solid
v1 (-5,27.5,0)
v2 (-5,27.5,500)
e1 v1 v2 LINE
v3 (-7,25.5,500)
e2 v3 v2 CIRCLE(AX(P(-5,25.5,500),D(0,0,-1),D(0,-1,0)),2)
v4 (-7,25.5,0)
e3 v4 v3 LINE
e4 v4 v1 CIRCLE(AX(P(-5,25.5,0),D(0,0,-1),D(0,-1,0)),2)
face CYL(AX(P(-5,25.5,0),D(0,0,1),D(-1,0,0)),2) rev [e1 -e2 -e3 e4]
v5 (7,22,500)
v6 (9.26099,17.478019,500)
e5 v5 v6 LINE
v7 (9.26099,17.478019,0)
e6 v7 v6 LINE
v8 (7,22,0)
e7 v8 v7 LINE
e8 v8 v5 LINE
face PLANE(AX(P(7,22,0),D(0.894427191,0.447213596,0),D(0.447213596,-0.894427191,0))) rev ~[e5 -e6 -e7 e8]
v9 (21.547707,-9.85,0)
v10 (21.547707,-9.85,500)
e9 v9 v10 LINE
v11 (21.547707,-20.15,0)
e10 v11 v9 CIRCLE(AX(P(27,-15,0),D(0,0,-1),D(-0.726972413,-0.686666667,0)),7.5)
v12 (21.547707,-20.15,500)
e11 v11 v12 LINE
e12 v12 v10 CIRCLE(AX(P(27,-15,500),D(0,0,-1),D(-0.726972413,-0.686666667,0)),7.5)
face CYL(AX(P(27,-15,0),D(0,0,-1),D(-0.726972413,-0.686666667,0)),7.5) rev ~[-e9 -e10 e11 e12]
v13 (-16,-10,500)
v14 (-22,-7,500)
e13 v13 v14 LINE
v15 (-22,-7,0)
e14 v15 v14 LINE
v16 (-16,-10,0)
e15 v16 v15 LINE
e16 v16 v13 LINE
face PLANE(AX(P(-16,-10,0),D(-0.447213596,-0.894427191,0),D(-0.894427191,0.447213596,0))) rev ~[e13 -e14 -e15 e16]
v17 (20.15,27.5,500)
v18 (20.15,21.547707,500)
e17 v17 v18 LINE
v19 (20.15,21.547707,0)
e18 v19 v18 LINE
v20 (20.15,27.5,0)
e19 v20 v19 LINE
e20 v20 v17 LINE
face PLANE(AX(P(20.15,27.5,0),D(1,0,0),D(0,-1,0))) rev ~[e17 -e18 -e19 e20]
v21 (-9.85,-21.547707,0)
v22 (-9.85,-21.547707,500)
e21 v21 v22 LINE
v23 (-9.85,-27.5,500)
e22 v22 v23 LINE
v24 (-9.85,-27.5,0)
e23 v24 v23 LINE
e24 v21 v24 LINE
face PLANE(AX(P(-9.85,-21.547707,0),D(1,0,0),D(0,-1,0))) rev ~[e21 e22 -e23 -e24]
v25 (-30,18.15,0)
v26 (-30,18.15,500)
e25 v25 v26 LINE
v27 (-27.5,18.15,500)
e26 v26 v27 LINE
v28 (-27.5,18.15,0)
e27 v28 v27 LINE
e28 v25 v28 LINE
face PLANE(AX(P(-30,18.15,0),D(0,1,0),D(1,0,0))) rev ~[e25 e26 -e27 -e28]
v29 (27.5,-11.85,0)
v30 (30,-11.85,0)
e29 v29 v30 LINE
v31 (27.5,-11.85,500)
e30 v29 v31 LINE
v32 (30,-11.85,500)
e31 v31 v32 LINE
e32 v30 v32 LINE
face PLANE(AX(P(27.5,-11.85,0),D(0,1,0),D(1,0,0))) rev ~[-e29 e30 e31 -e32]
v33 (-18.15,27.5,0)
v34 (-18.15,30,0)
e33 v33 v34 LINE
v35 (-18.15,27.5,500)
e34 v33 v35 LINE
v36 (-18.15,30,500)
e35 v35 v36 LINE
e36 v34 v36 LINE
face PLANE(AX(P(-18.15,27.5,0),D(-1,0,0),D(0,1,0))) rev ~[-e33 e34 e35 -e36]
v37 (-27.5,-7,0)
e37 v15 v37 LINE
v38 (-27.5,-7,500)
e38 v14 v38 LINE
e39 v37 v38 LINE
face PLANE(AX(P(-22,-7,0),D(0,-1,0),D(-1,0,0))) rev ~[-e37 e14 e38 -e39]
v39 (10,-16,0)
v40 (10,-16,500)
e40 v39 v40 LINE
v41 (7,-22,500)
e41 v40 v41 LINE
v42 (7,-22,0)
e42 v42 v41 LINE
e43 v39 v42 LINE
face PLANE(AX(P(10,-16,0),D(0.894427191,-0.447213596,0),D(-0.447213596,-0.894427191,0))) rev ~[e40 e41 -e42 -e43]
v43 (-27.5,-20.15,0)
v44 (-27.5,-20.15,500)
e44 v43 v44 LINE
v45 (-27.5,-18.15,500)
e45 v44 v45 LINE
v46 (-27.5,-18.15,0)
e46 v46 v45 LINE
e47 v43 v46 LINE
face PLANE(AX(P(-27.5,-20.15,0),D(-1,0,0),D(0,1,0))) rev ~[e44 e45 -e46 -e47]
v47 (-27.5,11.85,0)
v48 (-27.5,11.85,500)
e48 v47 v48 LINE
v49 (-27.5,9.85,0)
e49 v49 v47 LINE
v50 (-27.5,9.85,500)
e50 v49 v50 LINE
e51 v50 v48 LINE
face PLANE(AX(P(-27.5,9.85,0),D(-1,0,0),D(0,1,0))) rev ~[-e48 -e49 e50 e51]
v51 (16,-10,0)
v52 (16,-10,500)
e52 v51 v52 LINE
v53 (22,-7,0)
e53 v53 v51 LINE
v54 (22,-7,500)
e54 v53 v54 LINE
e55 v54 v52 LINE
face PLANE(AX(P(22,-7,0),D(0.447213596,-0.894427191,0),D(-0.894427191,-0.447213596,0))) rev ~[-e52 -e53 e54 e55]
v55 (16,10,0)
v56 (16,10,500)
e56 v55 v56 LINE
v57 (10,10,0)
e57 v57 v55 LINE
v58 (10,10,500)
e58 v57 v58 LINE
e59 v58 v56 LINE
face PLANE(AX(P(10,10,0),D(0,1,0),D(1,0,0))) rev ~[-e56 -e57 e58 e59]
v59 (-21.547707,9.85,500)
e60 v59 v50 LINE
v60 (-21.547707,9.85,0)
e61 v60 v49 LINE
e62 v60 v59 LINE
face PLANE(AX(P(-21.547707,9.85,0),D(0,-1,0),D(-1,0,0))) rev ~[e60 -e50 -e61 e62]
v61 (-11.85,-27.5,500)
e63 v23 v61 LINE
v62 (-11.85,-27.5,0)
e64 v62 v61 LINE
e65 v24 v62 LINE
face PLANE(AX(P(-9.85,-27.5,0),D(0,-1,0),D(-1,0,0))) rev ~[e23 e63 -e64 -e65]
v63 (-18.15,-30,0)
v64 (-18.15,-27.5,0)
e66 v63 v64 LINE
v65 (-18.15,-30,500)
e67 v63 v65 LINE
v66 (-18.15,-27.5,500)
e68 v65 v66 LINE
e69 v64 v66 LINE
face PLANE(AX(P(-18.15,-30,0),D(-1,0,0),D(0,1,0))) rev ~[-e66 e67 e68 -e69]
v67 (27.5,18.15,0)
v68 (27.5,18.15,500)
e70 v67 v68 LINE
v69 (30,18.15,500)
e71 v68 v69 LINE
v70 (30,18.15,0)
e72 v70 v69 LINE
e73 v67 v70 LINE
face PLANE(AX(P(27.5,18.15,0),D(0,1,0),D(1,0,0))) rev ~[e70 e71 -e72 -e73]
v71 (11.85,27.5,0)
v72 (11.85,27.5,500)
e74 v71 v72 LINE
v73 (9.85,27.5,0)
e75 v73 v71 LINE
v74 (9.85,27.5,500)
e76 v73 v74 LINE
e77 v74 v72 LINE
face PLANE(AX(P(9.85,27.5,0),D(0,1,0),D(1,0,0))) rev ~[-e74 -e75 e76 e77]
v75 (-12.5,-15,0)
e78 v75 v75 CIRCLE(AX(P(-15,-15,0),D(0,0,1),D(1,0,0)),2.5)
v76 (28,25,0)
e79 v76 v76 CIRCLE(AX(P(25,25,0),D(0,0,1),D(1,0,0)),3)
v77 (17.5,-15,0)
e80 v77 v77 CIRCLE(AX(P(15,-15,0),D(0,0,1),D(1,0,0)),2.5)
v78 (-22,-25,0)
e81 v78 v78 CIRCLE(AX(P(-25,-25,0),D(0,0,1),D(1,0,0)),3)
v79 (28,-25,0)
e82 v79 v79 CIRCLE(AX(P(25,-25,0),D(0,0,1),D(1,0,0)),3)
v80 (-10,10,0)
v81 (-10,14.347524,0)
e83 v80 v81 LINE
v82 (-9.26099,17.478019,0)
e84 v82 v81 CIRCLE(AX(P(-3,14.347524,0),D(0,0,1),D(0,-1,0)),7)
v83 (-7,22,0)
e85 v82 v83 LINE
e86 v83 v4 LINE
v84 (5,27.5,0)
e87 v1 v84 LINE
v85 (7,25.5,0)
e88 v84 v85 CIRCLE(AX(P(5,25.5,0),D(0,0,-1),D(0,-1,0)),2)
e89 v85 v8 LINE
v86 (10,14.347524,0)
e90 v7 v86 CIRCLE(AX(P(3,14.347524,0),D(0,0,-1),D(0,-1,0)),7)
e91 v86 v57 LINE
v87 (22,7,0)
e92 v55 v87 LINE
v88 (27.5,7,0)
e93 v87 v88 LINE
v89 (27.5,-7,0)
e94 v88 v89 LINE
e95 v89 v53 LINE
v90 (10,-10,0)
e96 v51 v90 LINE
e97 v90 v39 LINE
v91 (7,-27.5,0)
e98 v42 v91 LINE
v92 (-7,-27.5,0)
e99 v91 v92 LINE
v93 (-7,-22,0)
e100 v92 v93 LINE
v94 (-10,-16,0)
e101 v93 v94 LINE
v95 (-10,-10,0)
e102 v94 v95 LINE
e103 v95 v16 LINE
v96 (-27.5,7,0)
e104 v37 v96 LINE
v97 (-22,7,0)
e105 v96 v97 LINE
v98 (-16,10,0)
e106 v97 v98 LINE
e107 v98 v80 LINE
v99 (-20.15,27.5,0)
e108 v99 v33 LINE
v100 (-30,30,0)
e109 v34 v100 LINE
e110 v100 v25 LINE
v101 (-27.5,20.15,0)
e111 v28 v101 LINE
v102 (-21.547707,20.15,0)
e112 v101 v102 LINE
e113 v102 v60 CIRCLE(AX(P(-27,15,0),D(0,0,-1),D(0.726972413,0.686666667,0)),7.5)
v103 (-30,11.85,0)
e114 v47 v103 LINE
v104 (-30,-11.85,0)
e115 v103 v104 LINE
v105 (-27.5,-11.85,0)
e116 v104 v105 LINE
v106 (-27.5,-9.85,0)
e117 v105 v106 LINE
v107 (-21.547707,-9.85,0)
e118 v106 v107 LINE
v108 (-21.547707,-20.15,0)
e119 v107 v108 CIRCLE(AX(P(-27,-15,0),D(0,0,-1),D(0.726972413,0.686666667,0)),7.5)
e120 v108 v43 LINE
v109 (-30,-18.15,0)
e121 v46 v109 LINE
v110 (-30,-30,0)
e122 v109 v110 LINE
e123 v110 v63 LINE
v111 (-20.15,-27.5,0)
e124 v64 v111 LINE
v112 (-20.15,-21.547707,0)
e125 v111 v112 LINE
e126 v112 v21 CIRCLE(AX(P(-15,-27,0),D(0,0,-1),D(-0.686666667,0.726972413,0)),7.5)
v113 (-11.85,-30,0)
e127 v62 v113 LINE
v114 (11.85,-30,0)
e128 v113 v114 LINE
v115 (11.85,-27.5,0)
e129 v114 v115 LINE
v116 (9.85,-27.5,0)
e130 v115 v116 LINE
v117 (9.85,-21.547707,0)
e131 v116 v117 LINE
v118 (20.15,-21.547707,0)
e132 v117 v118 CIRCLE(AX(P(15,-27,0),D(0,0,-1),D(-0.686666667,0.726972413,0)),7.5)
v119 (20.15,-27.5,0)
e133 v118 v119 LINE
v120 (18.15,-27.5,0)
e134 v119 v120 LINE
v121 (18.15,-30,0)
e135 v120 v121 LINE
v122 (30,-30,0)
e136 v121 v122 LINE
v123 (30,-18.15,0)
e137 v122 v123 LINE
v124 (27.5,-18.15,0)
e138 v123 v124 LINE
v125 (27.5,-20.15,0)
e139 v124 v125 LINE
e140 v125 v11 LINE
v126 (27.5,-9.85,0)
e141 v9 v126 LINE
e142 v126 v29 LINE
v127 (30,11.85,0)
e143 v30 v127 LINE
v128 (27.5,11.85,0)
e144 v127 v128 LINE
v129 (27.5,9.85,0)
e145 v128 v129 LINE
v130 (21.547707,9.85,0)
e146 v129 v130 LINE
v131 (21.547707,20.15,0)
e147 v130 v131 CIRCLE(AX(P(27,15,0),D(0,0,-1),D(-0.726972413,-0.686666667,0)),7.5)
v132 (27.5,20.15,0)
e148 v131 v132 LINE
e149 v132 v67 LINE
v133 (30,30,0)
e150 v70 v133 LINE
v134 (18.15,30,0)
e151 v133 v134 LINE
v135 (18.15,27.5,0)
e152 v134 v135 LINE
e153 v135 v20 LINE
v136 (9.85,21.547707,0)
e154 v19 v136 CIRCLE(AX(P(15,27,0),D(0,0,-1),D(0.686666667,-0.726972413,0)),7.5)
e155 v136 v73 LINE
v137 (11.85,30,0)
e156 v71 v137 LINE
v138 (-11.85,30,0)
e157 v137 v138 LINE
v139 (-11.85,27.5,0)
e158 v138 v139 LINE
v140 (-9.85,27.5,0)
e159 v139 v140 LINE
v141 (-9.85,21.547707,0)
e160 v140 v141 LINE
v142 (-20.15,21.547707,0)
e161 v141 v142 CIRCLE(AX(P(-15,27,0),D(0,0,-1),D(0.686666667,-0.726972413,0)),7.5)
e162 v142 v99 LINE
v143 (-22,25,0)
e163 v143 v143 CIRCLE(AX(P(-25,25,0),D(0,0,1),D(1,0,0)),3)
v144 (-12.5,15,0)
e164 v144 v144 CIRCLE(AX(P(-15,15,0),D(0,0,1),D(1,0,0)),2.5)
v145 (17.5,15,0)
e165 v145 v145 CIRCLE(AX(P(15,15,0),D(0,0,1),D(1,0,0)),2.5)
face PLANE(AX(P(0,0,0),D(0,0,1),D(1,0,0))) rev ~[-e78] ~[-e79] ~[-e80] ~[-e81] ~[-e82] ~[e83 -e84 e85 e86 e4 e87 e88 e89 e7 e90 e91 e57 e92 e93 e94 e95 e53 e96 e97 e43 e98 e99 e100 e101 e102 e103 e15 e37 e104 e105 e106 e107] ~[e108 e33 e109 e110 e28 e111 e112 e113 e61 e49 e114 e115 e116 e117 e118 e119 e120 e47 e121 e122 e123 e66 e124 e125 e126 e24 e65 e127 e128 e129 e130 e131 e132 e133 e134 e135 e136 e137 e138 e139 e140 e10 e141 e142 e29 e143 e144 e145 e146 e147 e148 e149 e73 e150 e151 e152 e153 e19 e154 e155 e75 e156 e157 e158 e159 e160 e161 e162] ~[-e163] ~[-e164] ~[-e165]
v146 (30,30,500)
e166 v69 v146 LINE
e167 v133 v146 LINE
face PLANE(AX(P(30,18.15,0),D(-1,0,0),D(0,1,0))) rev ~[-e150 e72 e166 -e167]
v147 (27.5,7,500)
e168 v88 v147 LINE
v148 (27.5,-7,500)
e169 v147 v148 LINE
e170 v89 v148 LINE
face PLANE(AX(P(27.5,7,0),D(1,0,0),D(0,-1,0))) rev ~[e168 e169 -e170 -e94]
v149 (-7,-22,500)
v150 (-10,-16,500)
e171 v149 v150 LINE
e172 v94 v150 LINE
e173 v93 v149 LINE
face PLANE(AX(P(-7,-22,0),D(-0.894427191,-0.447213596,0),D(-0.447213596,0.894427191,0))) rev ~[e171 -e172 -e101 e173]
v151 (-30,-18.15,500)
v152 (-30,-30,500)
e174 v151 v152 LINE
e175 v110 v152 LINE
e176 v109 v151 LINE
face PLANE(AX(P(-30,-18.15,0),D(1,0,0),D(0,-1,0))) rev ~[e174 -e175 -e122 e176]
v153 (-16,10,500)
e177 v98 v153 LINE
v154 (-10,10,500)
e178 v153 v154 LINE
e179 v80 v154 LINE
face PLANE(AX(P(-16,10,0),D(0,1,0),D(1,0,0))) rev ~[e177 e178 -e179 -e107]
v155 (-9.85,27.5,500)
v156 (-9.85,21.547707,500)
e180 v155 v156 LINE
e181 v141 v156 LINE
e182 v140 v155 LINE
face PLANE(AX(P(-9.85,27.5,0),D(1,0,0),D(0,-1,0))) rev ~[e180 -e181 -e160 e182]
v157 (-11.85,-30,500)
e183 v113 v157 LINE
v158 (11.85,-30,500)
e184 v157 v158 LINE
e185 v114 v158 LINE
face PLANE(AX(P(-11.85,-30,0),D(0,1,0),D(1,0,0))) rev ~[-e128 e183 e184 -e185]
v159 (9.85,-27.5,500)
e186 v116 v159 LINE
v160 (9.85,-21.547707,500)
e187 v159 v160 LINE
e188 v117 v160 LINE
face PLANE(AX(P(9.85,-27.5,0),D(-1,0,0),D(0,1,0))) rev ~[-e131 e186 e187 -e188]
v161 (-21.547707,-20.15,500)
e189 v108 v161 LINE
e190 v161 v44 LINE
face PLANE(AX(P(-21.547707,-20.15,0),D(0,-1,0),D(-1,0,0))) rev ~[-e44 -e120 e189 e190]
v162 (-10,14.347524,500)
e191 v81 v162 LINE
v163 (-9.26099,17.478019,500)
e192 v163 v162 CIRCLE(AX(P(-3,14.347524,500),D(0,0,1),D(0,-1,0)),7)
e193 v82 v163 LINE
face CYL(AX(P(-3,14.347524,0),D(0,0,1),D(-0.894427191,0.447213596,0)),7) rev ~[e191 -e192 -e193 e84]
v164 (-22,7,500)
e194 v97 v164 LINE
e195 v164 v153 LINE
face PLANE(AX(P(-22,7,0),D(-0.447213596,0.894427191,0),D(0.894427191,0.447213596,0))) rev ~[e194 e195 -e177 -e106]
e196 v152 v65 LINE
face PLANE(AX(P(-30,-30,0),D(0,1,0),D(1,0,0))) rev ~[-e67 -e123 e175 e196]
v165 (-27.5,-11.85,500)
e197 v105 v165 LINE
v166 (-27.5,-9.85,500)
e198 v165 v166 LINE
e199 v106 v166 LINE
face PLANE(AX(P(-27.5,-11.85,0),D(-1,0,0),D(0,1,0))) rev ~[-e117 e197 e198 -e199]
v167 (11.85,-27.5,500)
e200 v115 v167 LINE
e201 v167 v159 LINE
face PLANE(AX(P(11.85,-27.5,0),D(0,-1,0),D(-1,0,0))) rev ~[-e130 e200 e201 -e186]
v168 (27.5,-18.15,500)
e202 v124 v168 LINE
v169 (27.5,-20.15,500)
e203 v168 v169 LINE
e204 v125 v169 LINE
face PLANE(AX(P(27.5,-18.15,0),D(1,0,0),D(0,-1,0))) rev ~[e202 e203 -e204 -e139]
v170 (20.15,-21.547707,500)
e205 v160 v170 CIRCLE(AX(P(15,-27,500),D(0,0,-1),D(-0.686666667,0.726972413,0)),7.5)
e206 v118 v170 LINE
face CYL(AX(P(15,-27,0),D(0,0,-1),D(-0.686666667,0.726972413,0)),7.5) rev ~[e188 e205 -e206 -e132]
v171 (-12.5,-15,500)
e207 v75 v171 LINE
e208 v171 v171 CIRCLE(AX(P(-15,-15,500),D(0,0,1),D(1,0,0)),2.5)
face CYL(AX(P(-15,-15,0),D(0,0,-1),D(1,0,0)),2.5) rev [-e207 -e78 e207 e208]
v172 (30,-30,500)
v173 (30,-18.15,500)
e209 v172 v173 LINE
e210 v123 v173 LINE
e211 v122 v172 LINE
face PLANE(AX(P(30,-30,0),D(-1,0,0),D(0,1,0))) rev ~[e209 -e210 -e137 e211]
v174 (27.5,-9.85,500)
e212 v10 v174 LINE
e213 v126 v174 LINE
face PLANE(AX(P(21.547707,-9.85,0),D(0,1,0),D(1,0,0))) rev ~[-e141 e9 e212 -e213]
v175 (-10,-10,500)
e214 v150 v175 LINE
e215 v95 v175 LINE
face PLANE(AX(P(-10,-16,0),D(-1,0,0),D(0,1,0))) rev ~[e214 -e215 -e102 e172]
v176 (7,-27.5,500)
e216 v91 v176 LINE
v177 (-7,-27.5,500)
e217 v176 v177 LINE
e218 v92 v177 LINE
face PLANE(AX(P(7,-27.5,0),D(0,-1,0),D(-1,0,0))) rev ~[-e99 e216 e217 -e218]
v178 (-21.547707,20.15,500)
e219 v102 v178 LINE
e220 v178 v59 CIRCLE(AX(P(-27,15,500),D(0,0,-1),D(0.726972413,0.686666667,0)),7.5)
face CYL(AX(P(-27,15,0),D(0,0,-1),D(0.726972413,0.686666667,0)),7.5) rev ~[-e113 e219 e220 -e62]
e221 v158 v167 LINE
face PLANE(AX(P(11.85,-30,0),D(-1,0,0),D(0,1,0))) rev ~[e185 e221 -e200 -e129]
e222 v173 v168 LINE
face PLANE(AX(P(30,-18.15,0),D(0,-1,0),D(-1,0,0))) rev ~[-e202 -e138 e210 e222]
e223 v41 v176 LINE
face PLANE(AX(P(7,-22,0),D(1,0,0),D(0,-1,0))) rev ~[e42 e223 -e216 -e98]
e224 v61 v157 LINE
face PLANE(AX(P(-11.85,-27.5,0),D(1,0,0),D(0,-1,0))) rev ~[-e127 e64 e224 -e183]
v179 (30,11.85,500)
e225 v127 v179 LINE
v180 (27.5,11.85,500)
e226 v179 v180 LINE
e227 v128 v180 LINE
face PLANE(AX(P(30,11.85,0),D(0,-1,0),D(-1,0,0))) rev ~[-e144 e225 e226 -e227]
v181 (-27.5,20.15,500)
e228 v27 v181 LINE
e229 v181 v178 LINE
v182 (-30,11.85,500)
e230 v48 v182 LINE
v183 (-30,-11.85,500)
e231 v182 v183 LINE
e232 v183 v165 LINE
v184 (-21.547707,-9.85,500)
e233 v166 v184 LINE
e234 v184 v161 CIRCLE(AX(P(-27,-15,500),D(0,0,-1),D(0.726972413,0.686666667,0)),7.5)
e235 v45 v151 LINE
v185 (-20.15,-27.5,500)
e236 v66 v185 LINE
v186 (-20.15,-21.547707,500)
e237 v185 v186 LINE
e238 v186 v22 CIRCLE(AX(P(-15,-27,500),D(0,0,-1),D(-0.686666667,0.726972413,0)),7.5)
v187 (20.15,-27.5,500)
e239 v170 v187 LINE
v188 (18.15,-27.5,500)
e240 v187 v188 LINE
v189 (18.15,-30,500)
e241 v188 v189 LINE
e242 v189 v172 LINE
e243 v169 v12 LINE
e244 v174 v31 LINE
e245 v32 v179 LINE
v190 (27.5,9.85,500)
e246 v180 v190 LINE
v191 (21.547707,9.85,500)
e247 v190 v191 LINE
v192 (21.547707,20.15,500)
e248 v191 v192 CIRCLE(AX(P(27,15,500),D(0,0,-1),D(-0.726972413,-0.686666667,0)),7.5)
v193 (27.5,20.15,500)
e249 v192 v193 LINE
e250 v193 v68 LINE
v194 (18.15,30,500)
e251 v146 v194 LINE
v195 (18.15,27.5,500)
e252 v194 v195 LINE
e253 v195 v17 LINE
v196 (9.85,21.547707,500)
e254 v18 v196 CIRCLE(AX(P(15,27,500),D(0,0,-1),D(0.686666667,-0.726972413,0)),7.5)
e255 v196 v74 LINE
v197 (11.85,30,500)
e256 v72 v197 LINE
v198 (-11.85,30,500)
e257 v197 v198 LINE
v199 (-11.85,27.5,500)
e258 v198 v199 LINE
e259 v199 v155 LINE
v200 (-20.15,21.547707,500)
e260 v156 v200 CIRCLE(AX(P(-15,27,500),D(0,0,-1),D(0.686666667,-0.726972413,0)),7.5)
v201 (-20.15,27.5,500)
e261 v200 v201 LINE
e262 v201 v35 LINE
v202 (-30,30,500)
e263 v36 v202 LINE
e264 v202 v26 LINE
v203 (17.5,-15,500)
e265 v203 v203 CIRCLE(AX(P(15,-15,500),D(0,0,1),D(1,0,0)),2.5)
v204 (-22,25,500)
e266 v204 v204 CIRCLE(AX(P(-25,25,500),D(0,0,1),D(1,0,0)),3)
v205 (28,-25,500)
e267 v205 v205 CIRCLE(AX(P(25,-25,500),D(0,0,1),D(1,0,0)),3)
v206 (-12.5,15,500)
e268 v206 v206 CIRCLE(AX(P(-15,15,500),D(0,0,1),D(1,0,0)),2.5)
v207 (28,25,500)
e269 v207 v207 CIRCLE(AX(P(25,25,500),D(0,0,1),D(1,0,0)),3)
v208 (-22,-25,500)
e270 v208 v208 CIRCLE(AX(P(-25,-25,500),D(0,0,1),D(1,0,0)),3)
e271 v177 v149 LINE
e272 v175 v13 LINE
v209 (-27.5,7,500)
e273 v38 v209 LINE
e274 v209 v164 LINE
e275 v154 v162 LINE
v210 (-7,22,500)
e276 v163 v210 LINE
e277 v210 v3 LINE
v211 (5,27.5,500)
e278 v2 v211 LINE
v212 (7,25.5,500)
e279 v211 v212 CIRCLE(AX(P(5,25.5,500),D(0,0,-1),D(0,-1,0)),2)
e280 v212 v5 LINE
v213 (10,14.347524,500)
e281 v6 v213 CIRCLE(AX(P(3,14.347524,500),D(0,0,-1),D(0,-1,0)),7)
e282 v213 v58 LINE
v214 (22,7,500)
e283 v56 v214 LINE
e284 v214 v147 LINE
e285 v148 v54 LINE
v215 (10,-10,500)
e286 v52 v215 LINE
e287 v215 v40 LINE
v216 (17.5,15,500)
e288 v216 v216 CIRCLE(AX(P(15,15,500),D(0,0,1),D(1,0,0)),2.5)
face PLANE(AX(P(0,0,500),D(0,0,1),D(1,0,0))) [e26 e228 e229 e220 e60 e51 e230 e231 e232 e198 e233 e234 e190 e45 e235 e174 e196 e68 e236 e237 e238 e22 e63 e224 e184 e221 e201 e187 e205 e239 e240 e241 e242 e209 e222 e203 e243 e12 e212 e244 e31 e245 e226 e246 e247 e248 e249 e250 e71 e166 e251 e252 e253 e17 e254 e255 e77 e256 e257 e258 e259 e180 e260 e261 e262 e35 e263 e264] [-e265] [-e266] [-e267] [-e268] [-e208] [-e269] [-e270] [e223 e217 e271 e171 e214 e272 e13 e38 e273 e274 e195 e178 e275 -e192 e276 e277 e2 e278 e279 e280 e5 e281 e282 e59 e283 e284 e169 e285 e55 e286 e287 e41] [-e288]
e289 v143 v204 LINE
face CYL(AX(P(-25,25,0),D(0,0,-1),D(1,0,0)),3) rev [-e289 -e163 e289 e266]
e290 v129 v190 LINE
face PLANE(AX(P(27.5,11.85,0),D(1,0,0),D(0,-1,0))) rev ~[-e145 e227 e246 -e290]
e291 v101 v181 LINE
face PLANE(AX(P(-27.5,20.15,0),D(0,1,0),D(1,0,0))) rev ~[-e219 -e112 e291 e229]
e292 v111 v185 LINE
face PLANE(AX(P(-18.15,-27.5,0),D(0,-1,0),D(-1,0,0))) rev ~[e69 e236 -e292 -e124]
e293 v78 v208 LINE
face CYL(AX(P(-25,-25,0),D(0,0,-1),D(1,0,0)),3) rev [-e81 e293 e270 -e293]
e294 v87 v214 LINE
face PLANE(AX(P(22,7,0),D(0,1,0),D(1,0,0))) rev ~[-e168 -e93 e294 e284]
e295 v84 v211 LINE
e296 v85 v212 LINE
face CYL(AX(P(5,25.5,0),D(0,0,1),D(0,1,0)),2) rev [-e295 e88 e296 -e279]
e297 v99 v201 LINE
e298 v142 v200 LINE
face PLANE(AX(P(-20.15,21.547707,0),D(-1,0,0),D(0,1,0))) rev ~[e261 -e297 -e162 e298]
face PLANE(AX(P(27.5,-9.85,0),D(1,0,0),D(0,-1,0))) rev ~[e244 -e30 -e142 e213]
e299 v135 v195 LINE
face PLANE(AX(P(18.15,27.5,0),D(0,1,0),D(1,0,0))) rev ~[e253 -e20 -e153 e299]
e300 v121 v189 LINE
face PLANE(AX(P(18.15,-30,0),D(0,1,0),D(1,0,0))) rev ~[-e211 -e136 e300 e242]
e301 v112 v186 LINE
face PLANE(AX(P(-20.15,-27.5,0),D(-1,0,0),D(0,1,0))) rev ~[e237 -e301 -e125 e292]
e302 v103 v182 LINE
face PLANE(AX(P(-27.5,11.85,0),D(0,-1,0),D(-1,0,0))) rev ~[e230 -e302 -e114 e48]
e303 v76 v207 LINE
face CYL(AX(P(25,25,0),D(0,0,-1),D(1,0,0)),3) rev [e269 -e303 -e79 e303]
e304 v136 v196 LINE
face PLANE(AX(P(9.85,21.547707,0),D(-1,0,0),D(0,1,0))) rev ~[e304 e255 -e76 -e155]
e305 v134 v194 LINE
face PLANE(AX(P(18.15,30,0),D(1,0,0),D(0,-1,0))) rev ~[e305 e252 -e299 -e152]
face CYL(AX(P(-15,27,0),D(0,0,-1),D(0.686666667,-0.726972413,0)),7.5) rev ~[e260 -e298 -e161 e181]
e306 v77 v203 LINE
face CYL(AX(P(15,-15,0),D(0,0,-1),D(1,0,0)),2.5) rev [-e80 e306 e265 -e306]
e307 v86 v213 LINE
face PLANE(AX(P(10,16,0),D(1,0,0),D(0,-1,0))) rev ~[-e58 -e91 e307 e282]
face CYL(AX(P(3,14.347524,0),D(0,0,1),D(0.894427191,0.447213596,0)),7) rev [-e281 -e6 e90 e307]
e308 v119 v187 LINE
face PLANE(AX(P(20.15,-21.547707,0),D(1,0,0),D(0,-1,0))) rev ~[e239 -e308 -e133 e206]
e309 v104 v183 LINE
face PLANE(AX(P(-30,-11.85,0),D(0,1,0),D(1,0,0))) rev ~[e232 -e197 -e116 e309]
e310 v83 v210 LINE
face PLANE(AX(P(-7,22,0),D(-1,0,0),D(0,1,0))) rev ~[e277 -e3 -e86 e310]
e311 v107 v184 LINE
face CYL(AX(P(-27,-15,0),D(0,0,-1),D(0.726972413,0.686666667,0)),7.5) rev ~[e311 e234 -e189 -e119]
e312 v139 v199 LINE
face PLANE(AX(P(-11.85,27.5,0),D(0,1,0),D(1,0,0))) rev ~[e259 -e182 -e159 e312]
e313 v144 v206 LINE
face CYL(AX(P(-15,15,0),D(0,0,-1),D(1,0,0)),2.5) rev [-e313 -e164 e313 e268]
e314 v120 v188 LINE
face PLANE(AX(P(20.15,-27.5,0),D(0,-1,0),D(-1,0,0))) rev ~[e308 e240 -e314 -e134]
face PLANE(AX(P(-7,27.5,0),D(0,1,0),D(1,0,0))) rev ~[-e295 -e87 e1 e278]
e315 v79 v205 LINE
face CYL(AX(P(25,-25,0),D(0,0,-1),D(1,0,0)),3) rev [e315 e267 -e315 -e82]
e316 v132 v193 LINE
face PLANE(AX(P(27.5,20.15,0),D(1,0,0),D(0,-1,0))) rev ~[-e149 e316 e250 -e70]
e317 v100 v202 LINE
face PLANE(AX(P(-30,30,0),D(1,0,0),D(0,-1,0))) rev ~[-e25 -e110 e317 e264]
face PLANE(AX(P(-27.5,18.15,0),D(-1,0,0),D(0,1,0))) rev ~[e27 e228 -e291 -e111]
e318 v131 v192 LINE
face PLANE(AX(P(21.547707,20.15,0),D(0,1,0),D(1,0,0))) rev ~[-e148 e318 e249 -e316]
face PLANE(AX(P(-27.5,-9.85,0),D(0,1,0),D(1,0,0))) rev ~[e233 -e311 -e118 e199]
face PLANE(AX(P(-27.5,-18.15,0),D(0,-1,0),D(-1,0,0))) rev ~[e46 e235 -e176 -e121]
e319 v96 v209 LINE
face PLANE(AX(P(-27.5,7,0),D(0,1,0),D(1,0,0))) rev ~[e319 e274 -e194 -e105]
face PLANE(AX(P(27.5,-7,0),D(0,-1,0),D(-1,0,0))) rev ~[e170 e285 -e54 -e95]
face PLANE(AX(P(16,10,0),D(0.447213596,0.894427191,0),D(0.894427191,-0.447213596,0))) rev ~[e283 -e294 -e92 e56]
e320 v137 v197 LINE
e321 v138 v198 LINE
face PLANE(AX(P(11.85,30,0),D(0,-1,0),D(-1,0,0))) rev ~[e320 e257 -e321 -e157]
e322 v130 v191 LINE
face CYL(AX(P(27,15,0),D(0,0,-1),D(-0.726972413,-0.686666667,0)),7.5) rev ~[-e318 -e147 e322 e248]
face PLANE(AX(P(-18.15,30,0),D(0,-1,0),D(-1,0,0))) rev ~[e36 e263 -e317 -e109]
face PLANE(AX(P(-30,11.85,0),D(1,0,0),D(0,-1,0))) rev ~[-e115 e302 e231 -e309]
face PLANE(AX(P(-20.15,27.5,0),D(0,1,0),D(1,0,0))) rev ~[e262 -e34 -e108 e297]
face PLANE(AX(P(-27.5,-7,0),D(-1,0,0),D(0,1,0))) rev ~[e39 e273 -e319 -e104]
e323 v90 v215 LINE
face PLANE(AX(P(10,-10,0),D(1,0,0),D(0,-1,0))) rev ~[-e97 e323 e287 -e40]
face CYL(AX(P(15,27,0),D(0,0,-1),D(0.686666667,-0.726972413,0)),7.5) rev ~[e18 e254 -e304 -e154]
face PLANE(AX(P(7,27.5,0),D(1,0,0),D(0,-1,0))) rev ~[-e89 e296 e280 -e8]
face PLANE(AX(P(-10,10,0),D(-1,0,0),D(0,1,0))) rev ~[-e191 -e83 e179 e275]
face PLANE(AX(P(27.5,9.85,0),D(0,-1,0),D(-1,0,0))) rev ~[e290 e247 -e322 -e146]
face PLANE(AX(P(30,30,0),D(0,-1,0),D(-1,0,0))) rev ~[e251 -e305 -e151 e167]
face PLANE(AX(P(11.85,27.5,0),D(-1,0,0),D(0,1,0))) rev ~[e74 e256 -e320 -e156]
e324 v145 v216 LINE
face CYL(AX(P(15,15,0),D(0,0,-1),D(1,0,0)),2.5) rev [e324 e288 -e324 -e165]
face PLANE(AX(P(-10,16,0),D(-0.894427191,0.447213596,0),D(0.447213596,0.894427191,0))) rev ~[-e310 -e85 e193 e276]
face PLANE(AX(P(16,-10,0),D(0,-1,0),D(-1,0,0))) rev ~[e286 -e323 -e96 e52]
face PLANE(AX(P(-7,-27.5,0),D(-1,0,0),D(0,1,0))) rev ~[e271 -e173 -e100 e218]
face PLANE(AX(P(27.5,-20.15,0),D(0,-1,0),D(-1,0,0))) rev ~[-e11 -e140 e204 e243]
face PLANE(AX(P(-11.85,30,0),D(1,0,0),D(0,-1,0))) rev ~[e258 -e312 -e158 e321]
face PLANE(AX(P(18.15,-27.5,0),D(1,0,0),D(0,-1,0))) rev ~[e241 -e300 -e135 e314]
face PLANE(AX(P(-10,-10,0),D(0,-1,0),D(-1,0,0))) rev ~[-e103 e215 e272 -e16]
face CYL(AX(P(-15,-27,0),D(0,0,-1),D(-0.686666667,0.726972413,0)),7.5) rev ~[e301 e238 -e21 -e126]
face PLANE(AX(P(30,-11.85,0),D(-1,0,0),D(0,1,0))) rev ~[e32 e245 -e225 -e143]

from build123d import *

# Parameters (mm, degrees)
F0_R     = 3
F0_R_2   = 2.5
F1_DEPTH = 500
F2_R     = 2
F3_R     = 7


# Not quite as in the source:
# - a feature names something its author has since deleted; it is built from what else it names


with BuildPart() as f1:
    # F0 (on Top) → F1 (new body)
    with BuildSketch(Plane.XY):
        with BuildLine():
            Line((18.15, -30), (30, -30))
            Line((30, -30), (30, -18.15))
            Line((30, -18.15), (27.5, -18.15))
            Line((27.5, -18.15), (27.5, -20.15))
            Line((27.5, -20.15), (21.5477069044, -20.15))
            ThreePointArc((21.5477069044, -20.15), (19.5, -15), (21.5477069044, -9.85))
            Line((21.5477069044, -9.85), (27.5, -9.85))
            Line((27.5, -9.85), (27.5, -11.85))
            Line((27.5, -11.85), (30, -11.85))
            Line((30, -11.85), (30, 11.85))
            Line((30, 11.85), (27.5, 11.85))
            Line((27.5, 11.85), (27.5, 9.85))
            Line((27.5, 9.85), (21.5477069044, 9.85))
            ThreePointArc((21.5477069044, 9.85), (19.5, 15), (21.5477069044, 20.15))
            Line((21.5477069044, 20.15), (27.5, 20.15))
            Line((27.5, 20.15), (27.5, 18.15))
            Line((27.5, 18.15), (30, 18.15))
            Line((30, 18.15), (30, 30))
            Line((30, 30), (18.15, 30))
            Line((18.15, 30), (18.15, 27.5))
            Line((18.15, 27.5), (20.15, 27.5))
            Line((20.15, 27.5), (20.15, 21.5477069044))
            ThreePointArc((20.15, 21.5477069044), (15, 19.5), (9.85, 21.5477069044))
            Line((9.85, 21.5477069044), (9.85, 27.5))
            Line((9.85, 27.5), (11.85, 27.5))
            Line((11.85, 27.5), (11.85, 30))
            Line((11.85, 30), (-11.85, 30))
            Line((-11.85, 30), (-11.85, 27.5))
            Line((-11.85, 27.5), (-9.85, 27.5))
            Line((-9.85, 27.5), (-9.85, 21.5477069044))
            ThreePointArc((-9.85, 21.5477069044), (-15, 19.5), (-20.15, 21.5477069044))
            Line((-20.15, 21.5477069044), (-20.15, 27.5))
            Line((-20.15, 27.5), (-18.15, 27.5))
            Line((-18.15, 27.5), (-18.15, 30))
            Line((-18.15, 30), (-30, 30))
            Line((-30, 30), (-30, 18.15))
            Line((-30, 18.15), (-27.5, 18.15))
            Line((-27.5, 18.15), (-27.5, 20.15))
            Line((-27.5, 20.15), (-21.5477069044, 20.15))
            ThreePointArc((-21.5477069044, 20.15), (-19.5, 15), (-21.5477069044, 9.85))
            Line((-21.5477069044, 9.85), (-27.5, 9.85))
            Line((-27.5, 9.85), (-27.5, 11.85))
            Line((-27.5, 11.85), (-30, 11.85))
            Line((-30, 11.85), (-30, -11.85))
            Line((-30, -11.85), (-27.5, -11.85))
            Line((-27.5, -11.85), (-27.5, -9.85))
            Line((-27.5, -9.85), (-21.5477069044, -9.85))
            ThreePointArc((-21.5477069044, -9.85), (-19.5, -15), (-21.5477069044, -20.15))
            Line((-21.5477069044, -20.15), (-27.5, -20.15))
            Line((-27.5, -20.15), (-27.5, -18.15))
            Line((-27.5, -18.15), (-30, -18.15))
            Line((-30, -18.15), (-30, -30))
            Line((-30, -30), (-18.15, -30))
            Line((-18.15, -30), (-18.15, -27.5))
            Line((-18.15, -27.5), (-20.15, -27.5))
            Line((-20.15, -27.5), (-20.15, -21.5477069044))
            ThreePointArc((-20.15, -21.5477069044), (-15, -19.5), (-9.85, -21.5477069044))
            Line((-9.85, -21.5477069044), (-9.85, -27.5))
            Line((-9.85, -27.5), (-11.85, -27.5))
            Line((-11.85, -27.5), (-11.85, -30))
            Line((-11.85, -30), (11.85, -30))
            Line((11.85, -30), (11.85, -27.5))
            Line((11.85, -27.5), (9.85, -27.5))
            Line((9.85, -27.5), (9.85, -21.5477069044))
            ThreePointArc((9.85, -21.5477069044), (15, -19.5), (20.15, -21.5477069044))
            Line((20.15, -21.5477069044), (20.15, -27.5))
            Line((20.15, -27.5), (18.15, -27.5))
            Line((18.15, -27.5), (18.15, -30))
        make_face()
        with Locations((-25, -25)):
            Circle(F0_R, mode=Mode.SUBTRACT)
        with Locations((-15, -15)):
            Circle(F0_R_2, mode=Mode.SUBTRACT)
        with Locations((25, -25)):
            Circle(F0_R, mode=Mode.SUBTRACT)
        with Locations((15, -15)):
            Circle(F0_R_2, mode=Mode.SUBTRACT)
        with Locations((-25, 25)):
            Circle(F0_R, mode=Mode.SUBTRACT)
        with Locations((-15, 15)):
            Circle(F0_R_2, mode=Mode.SUBTRACT)
        Polygon((-7, 22), (-7, 27.5), (0, 27.5), (7, 27.5), (7, 22), (10, 16), (10, 10), (16, 10), (22, 7), (27.5, 7), (27.5, 0), (27.5, -7), (22, -7), (16, -10), (10, -10), (10, -16), (7, -22), (7, -27.5), (0, -27.5), (-7, -27.5), (-7, -22), (-10, -16), (-10, -10), (-16, -10), (-22, -7), (-27.5, -7), (-27.5, 0), (-27.5, 7), (-22, 7), (-16, 10), (-10, 10), (-10, 16), align=None, mode=Mode.SUBTRACT)
        with Locations((15, 15)):
            Circle(F0_R_2, mode=Mode.SUBTRACT)
        with Locations((25, 25)):
            Circle(F0_R, mode=Mode.SUBTRACT)
    extrude(amount=F1_DEPTH)

    # F2
    f2_edges = [f1.edges().sort_by_distance(p)[0] for p in [
        (-7, 27.5, 250),
        (7, 27.5, 250),
    ]]
    fillet(f2_edges, radius=F2_R)

    # F3
    f3_edges = [f1.edges().sort_by_distance(p)[0] for p in [
        (-10, 16, 250),
        (10, 16, 250),
    ]]
    fillet(f3_edges, radius=F3_R)


solid = f1.part
